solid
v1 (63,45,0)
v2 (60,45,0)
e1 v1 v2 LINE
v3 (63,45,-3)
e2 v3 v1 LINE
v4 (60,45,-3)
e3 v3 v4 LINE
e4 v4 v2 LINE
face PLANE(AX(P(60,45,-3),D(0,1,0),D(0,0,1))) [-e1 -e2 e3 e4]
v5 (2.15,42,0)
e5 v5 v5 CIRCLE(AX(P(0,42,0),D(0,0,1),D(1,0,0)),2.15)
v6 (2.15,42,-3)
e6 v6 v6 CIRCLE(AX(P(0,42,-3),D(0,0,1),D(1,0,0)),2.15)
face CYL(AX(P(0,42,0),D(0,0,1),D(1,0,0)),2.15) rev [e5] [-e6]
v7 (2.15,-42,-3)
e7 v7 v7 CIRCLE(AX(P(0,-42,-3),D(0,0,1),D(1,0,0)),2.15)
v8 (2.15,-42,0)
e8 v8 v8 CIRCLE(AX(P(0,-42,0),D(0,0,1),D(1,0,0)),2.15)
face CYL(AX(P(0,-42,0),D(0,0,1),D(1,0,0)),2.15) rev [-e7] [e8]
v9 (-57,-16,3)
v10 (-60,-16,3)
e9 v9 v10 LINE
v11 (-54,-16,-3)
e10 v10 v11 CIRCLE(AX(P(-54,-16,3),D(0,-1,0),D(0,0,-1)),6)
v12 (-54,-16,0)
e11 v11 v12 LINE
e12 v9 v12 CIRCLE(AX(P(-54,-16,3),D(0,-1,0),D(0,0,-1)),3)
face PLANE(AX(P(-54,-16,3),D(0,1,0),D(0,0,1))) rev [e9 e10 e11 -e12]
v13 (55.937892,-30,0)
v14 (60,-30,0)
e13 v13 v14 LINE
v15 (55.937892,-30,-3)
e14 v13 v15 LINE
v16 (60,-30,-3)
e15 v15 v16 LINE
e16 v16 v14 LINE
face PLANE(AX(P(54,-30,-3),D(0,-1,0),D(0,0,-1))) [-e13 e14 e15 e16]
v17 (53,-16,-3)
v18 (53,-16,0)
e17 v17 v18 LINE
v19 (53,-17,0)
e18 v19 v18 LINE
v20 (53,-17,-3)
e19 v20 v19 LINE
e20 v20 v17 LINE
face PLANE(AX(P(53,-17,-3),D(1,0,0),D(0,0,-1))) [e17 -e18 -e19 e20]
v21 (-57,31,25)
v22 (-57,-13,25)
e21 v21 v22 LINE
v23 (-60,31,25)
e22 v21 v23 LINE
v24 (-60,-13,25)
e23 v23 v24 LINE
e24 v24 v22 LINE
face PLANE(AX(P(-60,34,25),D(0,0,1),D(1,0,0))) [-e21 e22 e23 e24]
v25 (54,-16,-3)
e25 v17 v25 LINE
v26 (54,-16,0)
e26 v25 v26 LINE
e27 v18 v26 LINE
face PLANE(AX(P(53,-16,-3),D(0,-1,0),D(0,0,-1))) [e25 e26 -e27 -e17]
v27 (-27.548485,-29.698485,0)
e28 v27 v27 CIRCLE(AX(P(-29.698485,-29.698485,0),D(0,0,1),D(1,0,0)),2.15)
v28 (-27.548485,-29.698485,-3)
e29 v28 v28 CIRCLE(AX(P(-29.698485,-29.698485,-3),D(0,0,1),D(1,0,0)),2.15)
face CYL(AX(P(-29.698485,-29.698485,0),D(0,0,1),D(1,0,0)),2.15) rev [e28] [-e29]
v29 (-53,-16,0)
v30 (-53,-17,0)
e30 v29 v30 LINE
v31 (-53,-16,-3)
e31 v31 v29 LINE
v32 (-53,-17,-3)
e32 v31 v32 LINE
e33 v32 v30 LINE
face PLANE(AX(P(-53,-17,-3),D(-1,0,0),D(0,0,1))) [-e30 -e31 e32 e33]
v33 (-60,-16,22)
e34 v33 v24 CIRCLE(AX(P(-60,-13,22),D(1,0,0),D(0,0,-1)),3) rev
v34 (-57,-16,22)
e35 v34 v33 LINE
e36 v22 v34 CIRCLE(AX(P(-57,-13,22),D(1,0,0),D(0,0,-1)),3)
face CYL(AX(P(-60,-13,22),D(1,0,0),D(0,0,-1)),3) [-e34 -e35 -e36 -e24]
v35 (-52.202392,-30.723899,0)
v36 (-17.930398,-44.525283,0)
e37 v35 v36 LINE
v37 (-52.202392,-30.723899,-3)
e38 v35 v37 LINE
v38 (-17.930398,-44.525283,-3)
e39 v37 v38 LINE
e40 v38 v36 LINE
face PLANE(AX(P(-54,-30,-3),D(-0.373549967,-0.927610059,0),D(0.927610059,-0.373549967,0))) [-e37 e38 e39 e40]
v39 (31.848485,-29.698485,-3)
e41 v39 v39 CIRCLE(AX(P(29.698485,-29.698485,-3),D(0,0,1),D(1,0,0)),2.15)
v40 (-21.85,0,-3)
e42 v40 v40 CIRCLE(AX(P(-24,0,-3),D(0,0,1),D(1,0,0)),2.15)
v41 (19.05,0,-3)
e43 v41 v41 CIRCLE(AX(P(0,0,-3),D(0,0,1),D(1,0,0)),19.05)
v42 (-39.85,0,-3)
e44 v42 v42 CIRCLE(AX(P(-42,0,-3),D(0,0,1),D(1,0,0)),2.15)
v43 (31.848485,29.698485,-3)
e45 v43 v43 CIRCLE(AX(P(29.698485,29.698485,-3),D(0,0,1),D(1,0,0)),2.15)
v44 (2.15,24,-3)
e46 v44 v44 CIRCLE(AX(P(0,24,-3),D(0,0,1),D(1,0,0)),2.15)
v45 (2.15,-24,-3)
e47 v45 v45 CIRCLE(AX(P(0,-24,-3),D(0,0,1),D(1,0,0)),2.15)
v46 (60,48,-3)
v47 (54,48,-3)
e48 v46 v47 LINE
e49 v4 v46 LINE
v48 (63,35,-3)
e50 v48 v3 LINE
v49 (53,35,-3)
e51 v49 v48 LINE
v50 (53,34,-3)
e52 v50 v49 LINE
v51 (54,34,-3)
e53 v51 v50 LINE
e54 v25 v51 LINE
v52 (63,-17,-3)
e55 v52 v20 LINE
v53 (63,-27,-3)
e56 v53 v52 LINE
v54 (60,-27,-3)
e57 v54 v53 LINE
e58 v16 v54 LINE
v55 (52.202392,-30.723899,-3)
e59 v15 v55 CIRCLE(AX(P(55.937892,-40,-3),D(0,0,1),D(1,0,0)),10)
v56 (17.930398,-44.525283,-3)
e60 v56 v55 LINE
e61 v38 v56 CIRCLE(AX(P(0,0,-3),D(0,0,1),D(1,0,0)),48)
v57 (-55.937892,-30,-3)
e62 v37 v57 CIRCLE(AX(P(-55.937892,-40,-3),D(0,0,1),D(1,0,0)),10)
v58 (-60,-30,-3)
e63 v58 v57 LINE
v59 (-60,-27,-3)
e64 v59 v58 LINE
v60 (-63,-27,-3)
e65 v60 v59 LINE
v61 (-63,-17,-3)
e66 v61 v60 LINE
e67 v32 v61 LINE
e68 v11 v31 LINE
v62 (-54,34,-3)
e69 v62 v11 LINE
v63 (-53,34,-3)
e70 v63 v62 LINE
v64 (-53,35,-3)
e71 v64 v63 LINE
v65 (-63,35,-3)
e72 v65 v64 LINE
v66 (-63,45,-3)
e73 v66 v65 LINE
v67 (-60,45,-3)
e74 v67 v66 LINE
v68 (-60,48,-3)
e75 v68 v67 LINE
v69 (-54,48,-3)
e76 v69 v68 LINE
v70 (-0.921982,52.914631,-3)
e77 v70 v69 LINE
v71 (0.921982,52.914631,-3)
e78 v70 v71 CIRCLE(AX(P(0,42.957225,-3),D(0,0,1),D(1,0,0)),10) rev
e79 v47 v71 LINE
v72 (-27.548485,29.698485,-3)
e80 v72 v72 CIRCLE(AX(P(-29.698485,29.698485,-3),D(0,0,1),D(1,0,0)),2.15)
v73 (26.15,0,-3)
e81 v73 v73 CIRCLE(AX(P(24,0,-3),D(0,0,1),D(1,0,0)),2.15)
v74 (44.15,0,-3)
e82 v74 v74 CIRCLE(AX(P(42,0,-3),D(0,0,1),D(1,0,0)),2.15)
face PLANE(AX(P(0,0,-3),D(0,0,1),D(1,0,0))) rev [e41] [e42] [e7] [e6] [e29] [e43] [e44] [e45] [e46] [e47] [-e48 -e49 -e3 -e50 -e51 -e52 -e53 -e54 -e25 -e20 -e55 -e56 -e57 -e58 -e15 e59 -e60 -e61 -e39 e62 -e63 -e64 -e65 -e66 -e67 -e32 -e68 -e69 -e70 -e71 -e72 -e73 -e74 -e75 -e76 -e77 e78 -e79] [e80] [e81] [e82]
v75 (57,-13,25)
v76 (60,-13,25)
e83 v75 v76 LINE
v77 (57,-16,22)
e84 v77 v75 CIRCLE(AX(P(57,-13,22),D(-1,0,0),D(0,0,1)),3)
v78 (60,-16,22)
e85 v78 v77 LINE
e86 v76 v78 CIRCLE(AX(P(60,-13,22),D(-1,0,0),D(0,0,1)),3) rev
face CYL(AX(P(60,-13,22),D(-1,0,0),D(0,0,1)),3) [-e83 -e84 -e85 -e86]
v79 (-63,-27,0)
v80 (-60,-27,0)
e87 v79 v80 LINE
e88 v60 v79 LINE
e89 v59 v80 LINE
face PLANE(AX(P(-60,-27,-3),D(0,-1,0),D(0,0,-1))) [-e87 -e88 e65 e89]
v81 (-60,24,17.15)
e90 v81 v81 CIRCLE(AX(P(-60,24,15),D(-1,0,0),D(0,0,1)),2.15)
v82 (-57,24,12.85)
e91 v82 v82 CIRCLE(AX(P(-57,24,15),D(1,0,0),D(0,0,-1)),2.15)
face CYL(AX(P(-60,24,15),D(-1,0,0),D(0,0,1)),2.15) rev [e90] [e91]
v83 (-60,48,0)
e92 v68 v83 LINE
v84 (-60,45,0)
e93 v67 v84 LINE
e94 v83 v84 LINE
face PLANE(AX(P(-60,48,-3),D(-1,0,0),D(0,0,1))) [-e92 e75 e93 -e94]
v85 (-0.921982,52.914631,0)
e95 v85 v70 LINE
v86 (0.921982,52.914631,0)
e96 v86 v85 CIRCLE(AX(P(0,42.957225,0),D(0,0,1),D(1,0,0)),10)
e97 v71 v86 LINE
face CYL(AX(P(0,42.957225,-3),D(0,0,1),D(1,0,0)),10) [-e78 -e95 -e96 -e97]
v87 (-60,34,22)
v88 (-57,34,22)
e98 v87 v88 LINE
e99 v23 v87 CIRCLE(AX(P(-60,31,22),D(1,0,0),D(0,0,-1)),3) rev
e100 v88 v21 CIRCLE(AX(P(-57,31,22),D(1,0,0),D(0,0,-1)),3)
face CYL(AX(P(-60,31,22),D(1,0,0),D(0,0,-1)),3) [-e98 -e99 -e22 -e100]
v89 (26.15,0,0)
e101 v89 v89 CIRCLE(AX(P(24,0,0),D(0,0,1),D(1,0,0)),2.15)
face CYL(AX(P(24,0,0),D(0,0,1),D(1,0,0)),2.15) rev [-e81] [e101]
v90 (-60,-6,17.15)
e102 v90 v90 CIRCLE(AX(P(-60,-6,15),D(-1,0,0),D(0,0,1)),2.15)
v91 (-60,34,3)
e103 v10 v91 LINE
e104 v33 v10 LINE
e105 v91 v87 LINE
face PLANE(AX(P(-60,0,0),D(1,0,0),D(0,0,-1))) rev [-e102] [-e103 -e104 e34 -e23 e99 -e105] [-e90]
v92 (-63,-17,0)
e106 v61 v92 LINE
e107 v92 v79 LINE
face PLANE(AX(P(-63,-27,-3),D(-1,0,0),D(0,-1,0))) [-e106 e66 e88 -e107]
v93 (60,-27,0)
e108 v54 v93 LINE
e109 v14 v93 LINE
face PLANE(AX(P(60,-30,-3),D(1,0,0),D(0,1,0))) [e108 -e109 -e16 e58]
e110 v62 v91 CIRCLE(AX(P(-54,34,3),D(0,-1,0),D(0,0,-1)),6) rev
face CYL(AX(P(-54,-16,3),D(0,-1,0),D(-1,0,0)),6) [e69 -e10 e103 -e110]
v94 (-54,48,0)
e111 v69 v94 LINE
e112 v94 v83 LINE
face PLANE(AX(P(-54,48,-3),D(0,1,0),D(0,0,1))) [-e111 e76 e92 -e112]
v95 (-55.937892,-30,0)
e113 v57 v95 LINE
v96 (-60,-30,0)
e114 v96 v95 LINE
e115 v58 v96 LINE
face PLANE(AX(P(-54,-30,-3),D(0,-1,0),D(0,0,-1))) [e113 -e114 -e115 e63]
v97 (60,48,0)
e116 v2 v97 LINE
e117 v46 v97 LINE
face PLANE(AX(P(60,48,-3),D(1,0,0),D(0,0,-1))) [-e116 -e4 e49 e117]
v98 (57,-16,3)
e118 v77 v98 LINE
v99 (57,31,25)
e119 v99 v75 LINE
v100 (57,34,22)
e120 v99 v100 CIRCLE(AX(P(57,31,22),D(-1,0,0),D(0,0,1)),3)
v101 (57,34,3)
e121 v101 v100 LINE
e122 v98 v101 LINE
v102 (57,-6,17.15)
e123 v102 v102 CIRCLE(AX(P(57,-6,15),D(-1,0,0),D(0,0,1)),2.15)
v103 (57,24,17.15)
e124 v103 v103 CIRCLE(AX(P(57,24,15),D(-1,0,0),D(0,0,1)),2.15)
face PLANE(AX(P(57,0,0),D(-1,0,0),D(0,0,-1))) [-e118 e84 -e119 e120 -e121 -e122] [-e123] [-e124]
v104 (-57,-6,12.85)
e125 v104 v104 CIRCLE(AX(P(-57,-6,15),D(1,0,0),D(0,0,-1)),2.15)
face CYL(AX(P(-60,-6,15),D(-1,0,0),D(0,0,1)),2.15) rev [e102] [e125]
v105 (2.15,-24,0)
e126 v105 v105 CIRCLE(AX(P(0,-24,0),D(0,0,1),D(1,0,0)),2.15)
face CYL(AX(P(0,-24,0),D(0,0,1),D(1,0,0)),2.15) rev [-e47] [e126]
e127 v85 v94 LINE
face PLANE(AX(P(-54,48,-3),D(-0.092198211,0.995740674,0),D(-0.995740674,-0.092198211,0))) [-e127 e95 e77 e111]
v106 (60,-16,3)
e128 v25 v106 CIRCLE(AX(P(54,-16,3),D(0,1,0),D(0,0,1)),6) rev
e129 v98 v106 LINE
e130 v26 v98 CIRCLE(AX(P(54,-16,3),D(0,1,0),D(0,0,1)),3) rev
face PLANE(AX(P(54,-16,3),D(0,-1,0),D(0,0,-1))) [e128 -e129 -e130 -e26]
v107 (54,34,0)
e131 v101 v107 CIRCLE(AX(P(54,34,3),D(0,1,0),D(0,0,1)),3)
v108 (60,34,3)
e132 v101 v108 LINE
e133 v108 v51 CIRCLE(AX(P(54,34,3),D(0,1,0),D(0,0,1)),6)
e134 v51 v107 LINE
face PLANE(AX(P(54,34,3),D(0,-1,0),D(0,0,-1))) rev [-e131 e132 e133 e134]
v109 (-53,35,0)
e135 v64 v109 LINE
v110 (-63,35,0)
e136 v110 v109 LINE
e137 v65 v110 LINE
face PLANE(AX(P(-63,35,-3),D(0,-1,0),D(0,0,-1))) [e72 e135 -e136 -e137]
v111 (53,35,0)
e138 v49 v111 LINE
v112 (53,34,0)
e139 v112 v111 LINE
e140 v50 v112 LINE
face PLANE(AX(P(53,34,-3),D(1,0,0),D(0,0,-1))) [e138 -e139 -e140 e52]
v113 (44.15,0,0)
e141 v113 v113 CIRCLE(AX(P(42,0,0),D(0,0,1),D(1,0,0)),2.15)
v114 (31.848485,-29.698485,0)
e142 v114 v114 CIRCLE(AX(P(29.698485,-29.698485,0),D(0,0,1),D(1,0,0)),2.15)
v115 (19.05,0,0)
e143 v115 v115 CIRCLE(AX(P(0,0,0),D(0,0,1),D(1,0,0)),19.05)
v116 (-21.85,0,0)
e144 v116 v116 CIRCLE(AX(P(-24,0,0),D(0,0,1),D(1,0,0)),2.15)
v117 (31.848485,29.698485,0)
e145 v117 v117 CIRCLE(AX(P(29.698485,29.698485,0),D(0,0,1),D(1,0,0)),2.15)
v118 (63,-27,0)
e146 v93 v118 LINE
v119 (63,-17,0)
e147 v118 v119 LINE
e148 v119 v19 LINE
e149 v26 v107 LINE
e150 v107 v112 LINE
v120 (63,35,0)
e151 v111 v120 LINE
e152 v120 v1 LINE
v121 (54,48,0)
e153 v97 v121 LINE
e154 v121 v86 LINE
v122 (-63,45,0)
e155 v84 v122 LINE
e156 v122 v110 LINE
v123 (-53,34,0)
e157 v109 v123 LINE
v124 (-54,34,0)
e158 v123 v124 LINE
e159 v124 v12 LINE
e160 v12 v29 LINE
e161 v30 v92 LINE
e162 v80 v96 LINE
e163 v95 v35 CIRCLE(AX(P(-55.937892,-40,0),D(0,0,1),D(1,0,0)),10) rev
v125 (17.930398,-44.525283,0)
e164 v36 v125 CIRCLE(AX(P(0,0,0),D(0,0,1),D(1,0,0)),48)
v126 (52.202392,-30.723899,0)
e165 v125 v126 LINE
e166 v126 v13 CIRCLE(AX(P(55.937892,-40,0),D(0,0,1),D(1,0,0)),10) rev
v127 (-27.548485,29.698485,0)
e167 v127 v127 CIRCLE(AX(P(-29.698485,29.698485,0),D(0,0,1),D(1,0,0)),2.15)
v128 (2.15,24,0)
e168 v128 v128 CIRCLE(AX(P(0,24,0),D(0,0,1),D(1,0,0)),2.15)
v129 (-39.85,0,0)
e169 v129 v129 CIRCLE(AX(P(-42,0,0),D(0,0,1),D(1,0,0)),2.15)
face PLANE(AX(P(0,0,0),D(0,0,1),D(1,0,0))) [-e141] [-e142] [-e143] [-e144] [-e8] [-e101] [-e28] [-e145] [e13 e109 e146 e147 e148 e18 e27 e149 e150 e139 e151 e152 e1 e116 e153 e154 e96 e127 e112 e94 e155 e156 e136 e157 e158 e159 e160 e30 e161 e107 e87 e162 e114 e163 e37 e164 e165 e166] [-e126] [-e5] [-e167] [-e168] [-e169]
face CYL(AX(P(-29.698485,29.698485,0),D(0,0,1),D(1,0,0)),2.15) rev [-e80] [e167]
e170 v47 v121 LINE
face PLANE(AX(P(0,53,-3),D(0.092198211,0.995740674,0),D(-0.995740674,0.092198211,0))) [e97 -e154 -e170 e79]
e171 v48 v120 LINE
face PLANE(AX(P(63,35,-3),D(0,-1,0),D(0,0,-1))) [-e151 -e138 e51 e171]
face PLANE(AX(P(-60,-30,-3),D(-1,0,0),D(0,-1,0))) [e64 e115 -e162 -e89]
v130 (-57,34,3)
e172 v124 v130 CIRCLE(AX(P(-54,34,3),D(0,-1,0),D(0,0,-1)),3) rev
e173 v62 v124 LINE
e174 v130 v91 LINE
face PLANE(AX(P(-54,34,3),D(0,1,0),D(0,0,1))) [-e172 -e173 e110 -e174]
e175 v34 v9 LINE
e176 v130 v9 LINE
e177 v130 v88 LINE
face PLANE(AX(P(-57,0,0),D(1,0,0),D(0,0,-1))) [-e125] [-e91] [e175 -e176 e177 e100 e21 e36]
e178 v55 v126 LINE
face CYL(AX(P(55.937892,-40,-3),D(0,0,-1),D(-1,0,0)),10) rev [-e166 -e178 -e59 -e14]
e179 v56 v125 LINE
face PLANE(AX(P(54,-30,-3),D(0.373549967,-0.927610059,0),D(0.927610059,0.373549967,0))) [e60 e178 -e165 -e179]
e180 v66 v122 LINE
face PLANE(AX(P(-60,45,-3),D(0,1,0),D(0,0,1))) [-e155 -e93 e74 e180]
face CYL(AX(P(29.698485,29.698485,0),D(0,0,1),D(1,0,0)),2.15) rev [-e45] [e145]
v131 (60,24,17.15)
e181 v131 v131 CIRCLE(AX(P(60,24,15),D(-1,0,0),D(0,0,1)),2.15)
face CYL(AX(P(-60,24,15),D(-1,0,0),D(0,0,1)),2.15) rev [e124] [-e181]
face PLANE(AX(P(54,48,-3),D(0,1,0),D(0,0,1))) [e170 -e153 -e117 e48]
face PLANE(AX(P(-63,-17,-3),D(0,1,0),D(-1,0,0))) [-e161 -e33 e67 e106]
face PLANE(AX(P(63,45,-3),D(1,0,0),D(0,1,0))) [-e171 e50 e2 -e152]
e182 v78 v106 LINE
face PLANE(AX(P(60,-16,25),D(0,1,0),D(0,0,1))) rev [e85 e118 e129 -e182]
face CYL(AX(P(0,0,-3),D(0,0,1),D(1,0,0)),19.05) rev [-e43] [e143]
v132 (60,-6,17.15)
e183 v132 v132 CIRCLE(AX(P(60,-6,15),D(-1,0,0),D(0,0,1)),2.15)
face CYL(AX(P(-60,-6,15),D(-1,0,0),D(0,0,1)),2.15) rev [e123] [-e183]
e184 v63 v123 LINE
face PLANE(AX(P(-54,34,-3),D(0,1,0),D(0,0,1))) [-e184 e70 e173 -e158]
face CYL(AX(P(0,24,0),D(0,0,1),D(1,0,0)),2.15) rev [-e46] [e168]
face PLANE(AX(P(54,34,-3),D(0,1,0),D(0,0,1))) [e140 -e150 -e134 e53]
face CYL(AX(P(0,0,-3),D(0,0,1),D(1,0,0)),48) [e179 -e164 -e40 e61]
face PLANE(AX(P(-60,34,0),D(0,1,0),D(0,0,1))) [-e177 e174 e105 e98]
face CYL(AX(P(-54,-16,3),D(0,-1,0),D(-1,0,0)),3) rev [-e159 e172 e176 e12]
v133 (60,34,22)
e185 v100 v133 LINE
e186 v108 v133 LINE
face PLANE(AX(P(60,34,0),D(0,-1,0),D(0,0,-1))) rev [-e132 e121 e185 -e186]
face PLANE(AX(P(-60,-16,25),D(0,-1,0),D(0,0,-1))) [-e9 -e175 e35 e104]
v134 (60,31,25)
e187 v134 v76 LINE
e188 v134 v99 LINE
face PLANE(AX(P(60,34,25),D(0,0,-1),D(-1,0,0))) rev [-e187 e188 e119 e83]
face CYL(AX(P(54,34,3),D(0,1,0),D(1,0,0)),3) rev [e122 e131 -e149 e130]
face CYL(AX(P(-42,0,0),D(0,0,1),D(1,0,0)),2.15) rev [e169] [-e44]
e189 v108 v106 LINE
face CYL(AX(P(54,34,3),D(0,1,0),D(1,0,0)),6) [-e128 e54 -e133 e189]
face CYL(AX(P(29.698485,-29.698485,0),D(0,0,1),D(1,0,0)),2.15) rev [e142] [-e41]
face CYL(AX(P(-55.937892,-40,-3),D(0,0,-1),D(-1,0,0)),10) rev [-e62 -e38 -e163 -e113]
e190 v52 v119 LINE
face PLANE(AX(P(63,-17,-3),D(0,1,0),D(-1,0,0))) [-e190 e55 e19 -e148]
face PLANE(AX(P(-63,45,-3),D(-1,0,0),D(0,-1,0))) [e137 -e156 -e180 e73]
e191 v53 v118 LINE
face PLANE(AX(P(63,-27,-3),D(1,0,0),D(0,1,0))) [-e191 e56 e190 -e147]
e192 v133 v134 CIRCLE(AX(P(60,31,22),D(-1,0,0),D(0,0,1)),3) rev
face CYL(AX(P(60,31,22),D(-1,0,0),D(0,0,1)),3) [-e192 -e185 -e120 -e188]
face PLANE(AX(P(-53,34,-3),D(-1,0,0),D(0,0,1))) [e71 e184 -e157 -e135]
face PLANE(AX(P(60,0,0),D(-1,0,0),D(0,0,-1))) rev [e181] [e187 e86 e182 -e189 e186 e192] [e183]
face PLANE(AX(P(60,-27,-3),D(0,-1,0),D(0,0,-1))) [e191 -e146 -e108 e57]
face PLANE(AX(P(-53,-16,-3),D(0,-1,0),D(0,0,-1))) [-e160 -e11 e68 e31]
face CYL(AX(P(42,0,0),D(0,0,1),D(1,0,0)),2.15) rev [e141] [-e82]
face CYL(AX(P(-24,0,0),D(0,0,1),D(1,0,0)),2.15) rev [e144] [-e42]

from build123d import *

# Parameters (mm, degrees)
SKETCH1_R                = 19.05
SKETCH1_R_2              = 1
BASE_FLANGE1_DEPTH       = 3
UP_DEPTH                 = 50
UP_START                 = -3
UP_PROFILE_W             = 50
UP_PROFILE_H             = 22
UP_PROFILE_R             = 1
UP_FLAT_DEPTH            = 3
M4_CLEARANCE_HOLE1_D     = 4.3
M4_CLEARANCE_HOLE1_DEPTH = 136
M4_CLEARANCE_HOLE1_TIP   = 1.291850331
M4_CLEARANCE_HOLE2_D     = 4.3
M4_CLEARANCE_HOLE2_DEPTH = 136
M4_CLEARANCE_HOLE2_TIP   = 1.291850331
FILLET1_R                = 10
FILLET2_R                = 3


# Sheet-metal steps are written as plain solids
with BuildPart() as part:
    # Sketch1 → Base-Flange1 (new body)
    with BuildSketch(Plane.XY):
        with BuildLine():
            Line((-54, -30), (-17.930398419, -44.525282846))
            ThreePointArc((-17.930398419, -44.525282846), (0, -48), (17.930398419, -44.525282846))
            Line((17.930398419, -44.525282846), (54, -30))
            Line((54, -30), (60, -30))
            Line((60, -30), (60, -27))
            Line((60, -27), (63, -27))
            Line((63, -27), (63, -17))
            Line((63, -17), (53, -17))
            Line((53, -17), (53, -16))
            Line((53, -16), (54, -16))
            Line((54, -16), (54, 34))
            Line((54, 34), (53, 34))
            Line((53, 34), (53, 35))
            Line((53, 35), (63, 35))
            Line((63, 35), (63, 45))
            Line((63, 45), (60, 45))
            Line((60, 45), (60, 48))
            Line((60, 48), (54, 48))
            Line((54, 48), (0, 53))
            Line((0, 53), (-54, 48))
            Line((-54, 48), (-60, 48))
            Line((-60, 48), (-60, 45))
            Line((-60, 45), (-63, 45))
            Line((-63, 45), (-63, 35))
            Line((-63, 35), (-53, 35))
            Line((-53, 35), (-53, 34))
            Line((-53, 34), (-54, 34))
            Line((-54, 34), (-54, -16))
            Line((-54, -16), (-53, -16))
            Line((-53, -16), (-53, -17))
            Line((-53, -17), (-63, -17))
            Line((-63, -17), (-63, -27))
            Line((-63, -27), (-60, -27))
            Line((-60, -27), (-60, -30))
            Line((-60, -30), (-54, -30))
        make_face()
        Circle(SKETCH1_R, mode=Mode.SUBTRACT)
        with Locations((0, 24)):
            Circle(SKETCH1_R_2, mode=Mode.SUBTRACT)
        with Locations((0, -42)):
            Circle(SKETCH1_R_2, mode=Mode.SUBTRACT)
        with Locations((-29.69848481, -29.69848481)):
            Circle(SKETCH1_R_2, mode=Mode.SUBTRACT)
        with Locations((-42, 0)):
            Circle(SKETCH1_R_2, mode=Mode.SUBTRACT)
        with Locations((-29.69848481, 29.69848481)):
            Circle(SKETCH1_R_2, mode=Mode.SUBTRACT)
        with Locations((0, 42)):
            Circle(SKETCH1_R_2, mode=Mode.SUBTRACT)
        with Locations((29.69848481, 29.69848481)):
            Circle(SKETCH1_R_2, mode=Mode.SUBTRACT)
        with Locations((42, 0)):
            Circle(SKETCH1_R_2, mode=Mode.SUBTRACT)
        with Locations((29.69848481, -29.69848481)):
            Circle(SKETCH1_R_2, mode=Mode.SUBTRACT)
        with Locations((24, 0)):
            Circle(SKETCH1_R_2, mode=Mode.SUBTRACT)
        with Locations((0, -24)):
            Circle(SKETCH1_R_2, mode=Mode.SUBTRACT)
        with Locations((-24, 0)):
            Circle(SKETCH1_R_2, mode=Mode.SUBTRACT)
    extrude(amount=-BASE_FLANGE1_DEPTH)

    # UP bend section (across the edge) → UP (add)
    with BuildSketch(Plane(origin=(-57, 34, 0), x_dir=(1, 0, 0), z_dir=(0, -1, 0))):
        with BuildLine():
            Line((-3, 3), (0, 3))
            ThreePointArc((0, 3), (0.878679656, 0.878679656), (3, 0))
            Line((3, 0), (3, -3))
            ThreePointArc((3, -3), (-1.242640687, -1.242640687), (-3, 3))
        make_face()
    up = extrude(amount=UP_DEPTH)

    # UP profile (on flange) → UP flat (add)
    with BuildSketch(Plane.YZ.offset(-57).offset(UP_START)):
        with Locations((9, 14)):
            Rectangle(UP_PROFILE_W, UP_PROFILE_H)
        with Locations((-6, 15)):
            Circle(UP_PROFILE_R, mode=Mode.SUBTRACT)
        with Locations((24, 15)):
            Circle(UP_PROFILE_R, mode=Mode.SUBTRACT)
    up_flat = extrude(amount=UP_FLAT_DEPTH)

    # Mirror1: UP, UP flat across plane
    add(up.mirror(Plane(origin=(0, 0, 0), x_dir=(0, 0, 1), z_dir=(1, 0, 0))))
    add(up_flat.mirror(Plane(origin=(0, 0, 0), x_dir=(0, 0, 1), z_dir=(1, 0, 0))))

    # M4 Clearance Hole1
    with Locations(Plane.XY):
        with Locations((0, 24), (24, 0), (-24, 0), (0, -24), (0, -42), (29.69848481, -29.69848481), (42, 0), (29.69848481, 29.69848481), (0, 42), (-29.69848481, 29.69848481), (-42, 0), (-29.69848481, -29.69848481)):
            Hole(M4_CLEARANCE_HOLE1_D / 2, depth=M4_CLEARANCE_HOLE1_DEPTH)
            with Locations((0, 0, -(M4_CLEARANCE_HOLE1_DEPTH + M4_CLEARANCE_HOLE1_TIP / 2))):  # 118° drill point
                Cone(0, M4_CLEARANCE_HOLE1_D / 2, M4_CLEARANCE_HOLE1_TIP, mode=Mode.SUBTRACT)

    # M4 Clearance Hole2
    with Locations(Plane.ZY.offset(60)):
        with Locations((15, 24), (15, -6)):
            Hole(M4_CLEARANCE_HOLE2_D / 2, depth=M4_CLEARANCE_HOLE2_DEPTH)
            with Locations((0, 0, -(M4_CLEARANCE_HOLE2_DEPTH + M4_CLEARANCE_HOLE2_TIP / 2))):  # 118° drill point
                Cone(0, M4_CLEARANCE_HOLE2_D / 2, M4_CLEARANCE_HOLE2_TIP, mode=Mode.SUBTRACT)

    # Fillet1
    fillet1_edges = [part.edges().sort_by_distance(p)[0] for p in [
        (0, 53, -1.5),
        (54, -30, -1.5),
        (-54, -30, -1.5),
    ]]
    fillet(fillet1_edges, radius=FILLET1_R)

    # Fillet2
    fillet2_edges = [part.edges().sort_by_distance(p)[0] for p in [
        (-58.5, 34, 25),
        (-58.5, -16, 25),
        (58.5, -16, 25),
        (58.5, 34, 25),
    ]]
    fillet(fillet2_edges, radius=FILLET2_R)


solid = part.part
